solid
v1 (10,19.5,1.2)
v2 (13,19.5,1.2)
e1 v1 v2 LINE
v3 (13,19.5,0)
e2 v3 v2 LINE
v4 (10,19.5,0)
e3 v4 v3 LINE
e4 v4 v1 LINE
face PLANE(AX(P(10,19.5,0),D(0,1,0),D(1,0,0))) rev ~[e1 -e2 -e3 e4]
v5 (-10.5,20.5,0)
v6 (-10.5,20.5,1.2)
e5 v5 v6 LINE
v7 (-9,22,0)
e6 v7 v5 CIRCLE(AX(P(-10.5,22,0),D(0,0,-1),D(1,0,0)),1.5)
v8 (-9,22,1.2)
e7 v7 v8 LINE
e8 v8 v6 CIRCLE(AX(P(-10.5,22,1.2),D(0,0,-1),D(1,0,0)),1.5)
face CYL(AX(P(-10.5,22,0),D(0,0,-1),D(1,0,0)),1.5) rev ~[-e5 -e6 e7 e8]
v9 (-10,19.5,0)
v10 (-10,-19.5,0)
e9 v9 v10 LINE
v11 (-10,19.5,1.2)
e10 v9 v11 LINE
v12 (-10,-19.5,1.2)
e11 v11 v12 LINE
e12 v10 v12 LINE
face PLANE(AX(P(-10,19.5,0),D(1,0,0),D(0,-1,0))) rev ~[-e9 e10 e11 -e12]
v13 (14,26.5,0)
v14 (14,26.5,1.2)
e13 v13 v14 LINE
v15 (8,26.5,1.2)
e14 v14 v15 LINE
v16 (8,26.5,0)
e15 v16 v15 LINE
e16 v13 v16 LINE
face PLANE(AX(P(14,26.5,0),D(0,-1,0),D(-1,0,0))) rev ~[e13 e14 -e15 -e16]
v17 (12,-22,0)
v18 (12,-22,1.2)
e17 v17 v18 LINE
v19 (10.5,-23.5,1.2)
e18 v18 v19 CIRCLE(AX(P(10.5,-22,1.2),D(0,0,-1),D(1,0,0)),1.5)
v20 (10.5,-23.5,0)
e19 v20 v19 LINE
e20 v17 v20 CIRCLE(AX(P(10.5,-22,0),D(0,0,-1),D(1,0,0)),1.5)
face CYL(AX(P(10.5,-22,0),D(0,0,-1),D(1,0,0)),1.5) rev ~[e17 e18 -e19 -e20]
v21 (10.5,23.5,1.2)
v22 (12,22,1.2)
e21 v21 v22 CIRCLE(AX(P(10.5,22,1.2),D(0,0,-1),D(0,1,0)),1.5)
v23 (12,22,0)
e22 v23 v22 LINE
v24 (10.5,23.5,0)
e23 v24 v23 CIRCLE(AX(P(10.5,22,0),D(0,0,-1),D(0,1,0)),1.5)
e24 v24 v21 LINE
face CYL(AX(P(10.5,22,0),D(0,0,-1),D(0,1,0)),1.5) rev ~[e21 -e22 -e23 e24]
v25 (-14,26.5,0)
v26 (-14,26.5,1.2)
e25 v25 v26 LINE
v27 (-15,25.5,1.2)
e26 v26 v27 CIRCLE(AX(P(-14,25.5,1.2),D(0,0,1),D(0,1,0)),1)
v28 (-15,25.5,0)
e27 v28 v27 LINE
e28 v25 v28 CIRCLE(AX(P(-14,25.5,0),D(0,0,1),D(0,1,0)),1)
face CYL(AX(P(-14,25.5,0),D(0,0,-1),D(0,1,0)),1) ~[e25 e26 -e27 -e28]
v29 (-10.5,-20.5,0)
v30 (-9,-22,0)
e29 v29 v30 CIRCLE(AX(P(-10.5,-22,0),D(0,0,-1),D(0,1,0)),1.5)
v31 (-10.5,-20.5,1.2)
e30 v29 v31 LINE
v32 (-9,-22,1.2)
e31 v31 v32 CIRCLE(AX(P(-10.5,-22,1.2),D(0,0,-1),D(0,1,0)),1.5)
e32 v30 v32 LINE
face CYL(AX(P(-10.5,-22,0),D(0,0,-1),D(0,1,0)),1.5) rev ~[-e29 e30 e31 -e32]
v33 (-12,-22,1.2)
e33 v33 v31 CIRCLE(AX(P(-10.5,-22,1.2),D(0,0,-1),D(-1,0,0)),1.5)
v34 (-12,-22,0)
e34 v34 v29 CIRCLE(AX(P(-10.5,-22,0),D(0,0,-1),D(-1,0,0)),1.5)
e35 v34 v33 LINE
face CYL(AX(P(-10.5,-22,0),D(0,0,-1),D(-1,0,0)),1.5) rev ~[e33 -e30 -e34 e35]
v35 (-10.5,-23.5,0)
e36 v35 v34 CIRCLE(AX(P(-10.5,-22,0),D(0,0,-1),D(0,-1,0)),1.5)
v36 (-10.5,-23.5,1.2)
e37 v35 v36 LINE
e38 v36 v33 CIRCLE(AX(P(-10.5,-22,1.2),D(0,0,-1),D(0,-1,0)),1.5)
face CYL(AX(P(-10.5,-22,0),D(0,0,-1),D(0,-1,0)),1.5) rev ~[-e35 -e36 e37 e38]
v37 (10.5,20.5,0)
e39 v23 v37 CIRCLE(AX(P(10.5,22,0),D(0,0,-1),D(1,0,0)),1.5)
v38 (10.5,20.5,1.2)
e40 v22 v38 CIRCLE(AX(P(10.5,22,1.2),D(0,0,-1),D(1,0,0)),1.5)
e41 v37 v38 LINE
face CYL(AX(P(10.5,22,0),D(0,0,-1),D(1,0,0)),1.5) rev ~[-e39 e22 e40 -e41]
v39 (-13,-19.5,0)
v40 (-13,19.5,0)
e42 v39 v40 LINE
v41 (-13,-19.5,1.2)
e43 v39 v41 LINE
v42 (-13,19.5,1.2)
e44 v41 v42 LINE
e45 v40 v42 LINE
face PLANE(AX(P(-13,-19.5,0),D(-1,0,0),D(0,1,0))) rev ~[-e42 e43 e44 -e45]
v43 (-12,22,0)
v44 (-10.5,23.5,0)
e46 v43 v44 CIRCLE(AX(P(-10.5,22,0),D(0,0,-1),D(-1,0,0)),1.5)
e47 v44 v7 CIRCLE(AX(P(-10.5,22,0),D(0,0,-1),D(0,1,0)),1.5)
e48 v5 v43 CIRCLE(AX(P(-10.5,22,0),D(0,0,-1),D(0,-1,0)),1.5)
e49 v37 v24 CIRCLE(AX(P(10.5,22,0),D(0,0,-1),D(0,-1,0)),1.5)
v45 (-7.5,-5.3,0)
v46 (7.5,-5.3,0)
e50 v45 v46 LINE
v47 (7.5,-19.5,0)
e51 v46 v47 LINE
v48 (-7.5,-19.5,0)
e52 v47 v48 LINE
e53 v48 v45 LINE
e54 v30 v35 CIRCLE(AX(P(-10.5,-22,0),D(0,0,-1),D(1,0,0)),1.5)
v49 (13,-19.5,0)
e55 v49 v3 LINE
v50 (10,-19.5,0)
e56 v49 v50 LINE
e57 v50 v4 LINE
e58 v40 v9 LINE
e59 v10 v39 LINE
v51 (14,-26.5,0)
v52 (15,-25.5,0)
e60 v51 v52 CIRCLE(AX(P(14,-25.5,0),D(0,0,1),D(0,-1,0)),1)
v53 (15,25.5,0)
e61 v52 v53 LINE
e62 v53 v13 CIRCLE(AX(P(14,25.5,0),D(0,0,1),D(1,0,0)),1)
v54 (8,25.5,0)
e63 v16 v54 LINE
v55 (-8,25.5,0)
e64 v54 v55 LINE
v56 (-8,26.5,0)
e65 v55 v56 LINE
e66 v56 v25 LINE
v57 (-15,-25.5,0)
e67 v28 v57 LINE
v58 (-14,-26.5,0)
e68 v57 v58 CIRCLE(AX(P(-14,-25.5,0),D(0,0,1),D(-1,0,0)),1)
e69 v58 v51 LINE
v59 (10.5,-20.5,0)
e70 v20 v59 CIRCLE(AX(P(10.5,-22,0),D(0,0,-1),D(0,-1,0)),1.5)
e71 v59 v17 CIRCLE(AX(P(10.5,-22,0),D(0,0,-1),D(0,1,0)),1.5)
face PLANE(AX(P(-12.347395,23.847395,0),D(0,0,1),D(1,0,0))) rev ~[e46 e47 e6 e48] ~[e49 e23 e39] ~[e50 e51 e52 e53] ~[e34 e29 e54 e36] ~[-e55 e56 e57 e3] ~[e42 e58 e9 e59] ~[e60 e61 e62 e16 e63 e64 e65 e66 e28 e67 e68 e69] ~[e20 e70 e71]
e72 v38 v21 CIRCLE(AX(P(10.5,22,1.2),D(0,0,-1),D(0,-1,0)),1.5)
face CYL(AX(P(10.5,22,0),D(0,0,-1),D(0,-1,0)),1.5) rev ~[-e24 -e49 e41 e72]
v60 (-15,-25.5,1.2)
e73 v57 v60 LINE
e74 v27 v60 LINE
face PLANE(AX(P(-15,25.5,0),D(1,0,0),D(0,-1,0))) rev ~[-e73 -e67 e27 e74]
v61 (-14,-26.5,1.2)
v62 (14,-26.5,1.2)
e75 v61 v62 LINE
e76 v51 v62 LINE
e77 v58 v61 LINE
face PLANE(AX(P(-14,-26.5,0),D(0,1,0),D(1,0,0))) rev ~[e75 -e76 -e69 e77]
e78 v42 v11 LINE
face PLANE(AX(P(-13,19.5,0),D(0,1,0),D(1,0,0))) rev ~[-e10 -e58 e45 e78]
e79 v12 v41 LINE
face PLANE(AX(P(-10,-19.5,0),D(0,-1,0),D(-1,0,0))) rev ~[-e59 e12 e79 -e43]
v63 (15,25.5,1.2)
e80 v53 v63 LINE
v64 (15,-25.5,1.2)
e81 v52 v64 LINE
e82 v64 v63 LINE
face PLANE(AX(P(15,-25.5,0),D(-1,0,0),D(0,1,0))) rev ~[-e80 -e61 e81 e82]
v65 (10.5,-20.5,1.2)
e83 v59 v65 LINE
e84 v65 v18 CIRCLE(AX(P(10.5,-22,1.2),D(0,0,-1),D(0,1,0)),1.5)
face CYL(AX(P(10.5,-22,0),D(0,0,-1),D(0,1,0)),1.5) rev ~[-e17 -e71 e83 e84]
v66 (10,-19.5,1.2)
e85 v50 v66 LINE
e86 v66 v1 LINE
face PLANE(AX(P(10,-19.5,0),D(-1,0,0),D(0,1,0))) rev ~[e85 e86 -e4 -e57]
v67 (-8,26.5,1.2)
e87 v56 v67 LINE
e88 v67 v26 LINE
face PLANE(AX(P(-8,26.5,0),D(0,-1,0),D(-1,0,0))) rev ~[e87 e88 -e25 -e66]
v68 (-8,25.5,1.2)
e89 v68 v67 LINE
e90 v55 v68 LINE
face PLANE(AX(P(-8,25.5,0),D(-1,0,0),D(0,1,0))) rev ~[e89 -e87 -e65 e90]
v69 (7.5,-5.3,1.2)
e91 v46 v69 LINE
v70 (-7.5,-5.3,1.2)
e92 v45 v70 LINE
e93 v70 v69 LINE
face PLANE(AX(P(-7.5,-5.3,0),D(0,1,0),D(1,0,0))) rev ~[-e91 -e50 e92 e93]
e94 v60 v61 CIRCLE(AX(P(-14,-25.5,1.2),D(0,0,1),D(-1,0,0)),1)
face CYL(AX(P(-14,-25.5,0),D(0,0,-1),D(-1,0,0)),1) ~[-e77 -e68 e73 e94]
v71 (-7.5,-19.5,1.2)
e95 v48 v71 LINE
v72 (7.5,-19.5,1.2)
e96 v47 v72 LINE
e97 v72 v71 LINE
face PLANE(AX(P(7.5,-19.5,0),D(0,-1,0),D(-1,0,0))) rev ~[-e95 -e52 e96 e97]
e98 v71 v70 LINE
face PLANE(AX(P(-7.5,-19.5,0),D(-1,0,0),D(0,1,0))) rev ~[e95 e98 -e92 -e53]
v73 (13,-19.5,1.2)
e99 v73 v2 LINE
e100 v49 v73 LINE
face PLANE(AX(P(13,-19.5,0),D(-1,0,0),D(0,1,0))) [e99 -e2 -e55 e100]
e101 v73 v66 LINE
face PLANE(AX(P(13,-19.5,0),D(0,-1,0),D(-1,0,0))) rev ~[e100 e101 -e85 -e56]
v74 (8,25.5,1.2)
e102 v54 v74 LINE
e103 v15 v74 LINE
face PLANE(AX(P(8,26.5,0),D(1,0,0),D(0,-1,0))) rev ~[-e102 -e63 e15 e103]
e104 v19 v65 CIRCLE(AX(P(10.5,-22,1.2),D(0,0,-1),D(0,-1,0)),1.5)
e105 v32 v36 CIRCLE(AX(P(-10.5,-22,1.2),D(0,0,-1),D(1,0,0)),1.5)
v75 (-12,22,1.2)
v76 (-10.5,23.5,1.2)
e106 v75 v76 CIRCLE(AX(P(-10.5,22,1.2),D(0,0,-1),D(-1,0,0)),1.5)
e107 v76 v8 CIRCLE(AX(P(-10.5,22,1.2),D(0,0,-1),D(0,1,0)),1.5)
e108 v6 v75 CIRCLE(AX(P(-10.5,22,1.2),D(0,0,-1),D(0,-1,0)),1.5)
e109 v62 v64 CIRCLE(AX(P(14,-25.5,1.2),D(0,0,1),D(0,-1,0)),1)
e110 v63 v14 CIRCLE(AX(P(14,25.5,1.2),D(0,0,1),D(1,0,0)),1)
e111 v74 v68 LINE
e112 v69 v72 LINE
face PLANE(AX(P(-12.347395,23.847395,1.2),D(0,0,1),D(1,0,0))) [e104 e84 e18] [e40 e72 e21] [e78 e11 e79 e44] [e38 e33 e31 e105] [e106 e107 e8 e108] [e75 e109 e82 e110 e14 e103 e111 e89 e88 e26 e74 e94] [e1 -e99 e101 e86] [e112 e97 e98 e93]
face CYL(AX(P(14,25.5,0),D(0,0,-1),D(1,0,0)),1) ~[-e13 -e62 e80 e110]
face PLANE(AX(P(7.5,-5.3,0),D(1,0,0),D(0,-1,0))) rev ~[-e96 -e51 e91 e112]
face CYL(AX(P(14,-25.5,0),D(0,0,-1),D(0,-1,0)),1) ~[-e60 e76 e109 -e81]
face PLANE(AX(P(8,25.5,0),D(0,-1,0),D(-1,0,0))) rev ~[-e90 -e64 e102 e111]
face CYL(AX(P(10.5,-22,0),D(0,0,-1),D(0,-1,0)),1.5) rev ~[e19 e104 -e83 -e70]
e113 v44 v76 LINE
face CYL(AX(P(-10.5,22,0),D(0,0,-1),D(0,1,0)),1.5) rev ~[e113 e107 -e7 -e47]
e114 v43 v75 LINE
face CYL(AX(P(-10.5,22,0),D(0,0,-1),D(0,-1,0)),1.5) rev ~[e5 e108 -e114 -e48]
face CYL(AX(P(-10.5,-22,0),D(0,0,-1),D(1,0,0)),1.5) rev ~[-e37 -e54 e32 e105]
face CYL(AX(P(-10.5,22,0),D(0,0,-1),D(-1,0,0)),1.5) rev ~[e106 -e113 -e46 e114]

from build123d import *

# Parameters (mm, degrees)
F0_W     = 4
F0_H     = 1
F0_W_2   = 2
F0_H_2   = 39
F0_W_3   = 2.5
F0_H_3   = 0.8
F0_W_4   = 7.5
F0_W_5   = 0.5
F1_DEPTH = 1.2


with BuildPart() as f1:
    # F0 (on Top) → F1 (new body)
    with BuildSketch(Plane.XY):
        with BuildLine():
            Line((-13, 24.5), (-12, 24.5))
            Line((-12, 24.5), (-10.5, 24.5))
            Line((-10.5, 24.5), (-8, 24.5))
            Line((-8, 24.5), (-8, 25.5))
            Line((-8, 25.5), (-8, 26.5))
            Line((-8, 26.5), (-14, 26.5))
            ThreePointArc((-14, 26.5), (-14.7071067812, 26.2071067812), (-15, 25.5))
            Line((-15, 25.5), (-15, 19.5))
            Line((-15, 19.5), (-13, 19.5))
            Line((-13, 19.5), (-13, 22))
            Line((-13, 22), (-13, 23.5))
            Line((-13, 23.5), (-13, 24.5))
        make_face()
        with BuildLine():
            Line((-10.5, 24.5), (-12, 24.5))
            ThreePointArc((-12, 24.5), (-12.7071067812, 24.2071067812), (-13, 23.5))
            Line((-13, 23.5), (-13, 22))
            Line((-13, 22), (-12, 22))
            ThreePointArc((-12, 22), (-11.5606601718, 23.0606601718), (-10.5, 23.5))
            Line((-10.5, 23.5), (-10.5, 24.5))
        make_face()
        with BuildLine():
            ThreePointArc((-13, 23.5), (-12.7071067812, 24.2071067812), (-12, 24.5))
            Line((-12, 24.5), (-13, 24.5))
            Line((-13, 24.5), (-13, 23.5))
        make_face()
        with BuildLine():
            Line((-8, 24.5), (-10.5, 24.5))
            Line((-10.5, 24.5), (-10.5, 23.5))
            ThreePointArc((-10.5, 23.5), (-9.4393398282, 23.0606601718), (-9, 22))
            ThreePointArc((-9, 22), (-9.4393398282, 20.9393398282), (-10.5, 20.5))
            Line((-10.5, 20.5), (-10.5, 19.5))
            Line((-10.5, 19.5), (-10, 19.5))
            Line((-10, 19.5), (10, 19.5))
            Line((10, 19.5), (10.5, 19.5))
            Line((10.5, 19.5), (10.5, 20.5))
            ThreePointArc((10.5, 20.5), (9, 22), (10.5, 23.5))
            Line((10.5, 23.5), (10.5, 24.5))
            Line((10.5, 24.5), (8, 24.5))
            Line((8, 24.5), (4, 24.5))
            Line((4, 24.5), (4, 20))
            Line((4, 20), (-4, 20))
            Line((-4, 20), (-4, 24.5))
            Line((-4, 24.5), (-8, 24.5))
        make_face()
        with Locations((-6, 25)):
            Rectangle(F0_W, F0_H)
        with BuildLine():
            Line((-12, 22), (-13, 22))
            Line((-13, 22), (-13, 19.5))
            Line((-13, 19.5), (-10.5, 19.5))
            Line((-10.5, 19.5), (-10.5, 20.5))
            ThreePointArc((-10.5, 20.5), (-11.5606601718, 20.9393398282), (-12, 22))
        make_face()
        with Locations((-2, 25)):
            Rectangle(F0_W, F0_H)
        Polygon((0, 24.5), (-4, 24.5), (-4, 20), (4, 20), (4, 24.5), align=None)
        with Locations((-14, 0)):
            Rectangle(F0_W_2, F0_H_2)
        with Locations((2, 25)):
            Rectangle(F0_W, F0_H)
        with Locations((-11.75, -19.9)):
            Rectangle(F0_W_3, F0_H_3)
        with Locations((-14, -19.9)):
            Rectangle(F0_W_2, F0_H_3)
        with Locations((6, 25)):
            Rectangle(F0_W, F0_H)
        with BuildLine():
            Line((-10.5, -20.3), (-13, -20.3))
            Line((-13, -20.3), (-13, -22))
            Line((-13, -22), (-12, -22))
            ThreePointArc((-12, -22), (-11.5606601718, -20.9393398282), (-10.5, -20.5))
            Line((-10.5, -20.5), (-10.5, -20.3))
        make_face()
        with BuildLine():
            Line((-13, -22), (-13, -20.3))
            Line((-13, -20.3), (-15, -20.3))
            Line((-15, -20.3), (-15, -25.5))
            ThreePointArc((-15, -25.5), (-14.7071067812, -26.2071067812), (-14, -26.5))
            Line((-14, -26.5), (14, -26.5))
            ThreePointArc((14, -26.5), (14.7071067812, -26.2071067812), (15, -25.5))
            Line((15, -25.5), (15, -20.3))
            Line((15, -20.3), (13, -20.3))
            Line((13, -20.3), (13, -22))
            Line((13, -22), (13, -23.5))
            ThreePointArc((13, -23.5), (12.7071067812, -24.2071067812), (12, -24.5))
            Line((12, -24.5), (10.5, -24.5))
            Line((10.5, -24.5), (-10.5, -24.5))
            Line((-10.5, -24.5), (-12, -24.5))
            ThreePointArc((-12, -24.5), (-12.7071067812, -24.2071067812), (-13, -23.5))
            Line((-13, -23.5), (-13, -22))
        make_face()
        Polygon((-10, -19.5), (-10.5, -19.5), (-10.5, -20.3), (-7.5, -20.3), (-7.5, -19.5), align=None)
        Polygon((10, 19.5), (-10, 19.5), (-10, -19.5), (-7.5, -19.5), (-7.5, -5.3), (7.5, -5.3), (7.5, -19.5), (10, -19.5), (10, 19.1765315831), align=None)
        with BuildLine():
            Line((8, 25.5), (8, 24.5))
            Line((8, 24.5), (10.5, 24.5))
            Line((10.5, 24.5), (12, 24.5))
            ThreePointArc((12, 24.5), (12.7071067812, 24.2071067812), (13, 23.5))
            Line((13, 23.5), (13, 22))
            Line((13, 22), (13, 19.5))
            Line((13, 19.5), (15, 19.5))
            Line((15, 19.5), (15, 25.5))
            ThreePointArc((15, 25.5), (14.7071067812, 26.2071067812), (14, 26.5))
            Line((14, 26.5), (8, 26.5))
            Line((8, 26.5), (8, 25.5))
        make_face()
        with BuildLine():
            Line((-12, -22), (-13, -22))
            Line((-13, -22), (-13, -23.5))
            ThreePointArc((-13, -23.5), (-12.7071067812, -24.2071067812), (-12, -24.5))
            Line((-12, -24.5), (-10.5, -24.5))
            Line((-10.5, -24.5), (-10.5, -23.5))
            ThreePointArc((-10.5, -23.5), (-11.5606601718, -23.0606601718), (-12, -22))
        make_face()
        with BuildLine():
            Line((-7.5, -20.3), (-10.5, -20.3))
            Line((-10.5, -20.3), (-10.5, -20.5))
            ThreePointArc((-10.5, -20.5), (-9.4393398282, -20.9393398282), (-9, -22))
            ThreePointArc((-9, -22), (-9.4393398282, -23.0606601718), (-10.5, -23.5))
            Line((-10.5, -23.5), (-10.5, -24.5))
            Line((-10.5, -24.5), (10.5, -24.5))
            Line((10.5, -24.5), (10.5, -23.5))
            ThreePointArc((10.5, -23.5), (9, -22), (10.5, -20.5))
            Line((10.5, -20.5), (10.5, -20.3))
            Line((10.5, -20.3), (10, -20.3))
            Line((10, -20.3), (7.5, -20.3))
            Line((7.5, -20.3), (0, -20.3))
            Line((0, -20.3), (-7.5, -20.3))
        make_face()
        with BuildLine():
            Line((12, 24.5), (10.5, 24.5))
            Line((10.5, 24.5), (10.5, 23.5))
            ThreePointArc((10.5, 23.5), (11.5606601718, 23.0606601718), (12, 22))
            Line((12, 22), (13, 22))
            Line((13, 22), (13, 23.5))
            ThreePointArc((13, 23.5), (12.7071067812, 24.2071067812), (12, 24.5))
        make_face()
        with Locations((-3.75, -19.9)):
            Rectangle(F0_W_4, F0_H_3)
        with BuildLine():
            Line((10.5, 20.5), (10.5, 19.5))
            Line((10.5, 19.5), (13, 19.5))
            Line((13, 19.5), (13, 22))
            Line((13, 22), (12, 22))
            ThreePointArc((12, 22), (11.5606601718, 20.9393398282), (10.5, 20.5))
        make_face()
        with Locations((3.75, -19.9)):
            Rectangle(F0_W_4, F0_H_3)
        with Locations((8.75, -19.9)):
            Rectangle(F0_W_3, F0_H_3)
        with Locations((10.25, -19.9)):
            Rectangle(F0_W_5, F0_H_3)
        with Locations((14, 0)):
            Rectangle(F0_W_2, F0_H_2)
        with Locations((11.75, -19.9)):
            Rectangle(F0_W_3, F0_H_3)
        with Locations((14, -19.9)):
            Rectangle(F0_W_2, F0_H_3)
        with BuildLine():
            Line((10.5, -23.5), (10.5, -24.5))
            Line((10.5, -24.5), (12, -24.5))
            ThreePointArc((12, -24.5), (12.7071067812, -24.2071067812), (13, -23.5))
            Line((13, -23.5), (13, -22))
            Line((13, -22), (12, -22))
            ThreePointArc((12, -22), (11.5606601718, -23.0606601718), (10.5, -23.5))
        make_face()
        with BuildLine():
            Line((13, -20.3), (10.5, -20.3))
            Line((10.5, -20.3), (10.5, -20.5))
            ThreePointArc((10.5, -20.5), (11.5606601718, -20.9393398282), (12, -22))
            Line((12, -22), (13, -22))
            Line((13, -22), (13, -20.3))
        make_face()
    extrude(amount=F1_DEPTH)


solid = f1.part
